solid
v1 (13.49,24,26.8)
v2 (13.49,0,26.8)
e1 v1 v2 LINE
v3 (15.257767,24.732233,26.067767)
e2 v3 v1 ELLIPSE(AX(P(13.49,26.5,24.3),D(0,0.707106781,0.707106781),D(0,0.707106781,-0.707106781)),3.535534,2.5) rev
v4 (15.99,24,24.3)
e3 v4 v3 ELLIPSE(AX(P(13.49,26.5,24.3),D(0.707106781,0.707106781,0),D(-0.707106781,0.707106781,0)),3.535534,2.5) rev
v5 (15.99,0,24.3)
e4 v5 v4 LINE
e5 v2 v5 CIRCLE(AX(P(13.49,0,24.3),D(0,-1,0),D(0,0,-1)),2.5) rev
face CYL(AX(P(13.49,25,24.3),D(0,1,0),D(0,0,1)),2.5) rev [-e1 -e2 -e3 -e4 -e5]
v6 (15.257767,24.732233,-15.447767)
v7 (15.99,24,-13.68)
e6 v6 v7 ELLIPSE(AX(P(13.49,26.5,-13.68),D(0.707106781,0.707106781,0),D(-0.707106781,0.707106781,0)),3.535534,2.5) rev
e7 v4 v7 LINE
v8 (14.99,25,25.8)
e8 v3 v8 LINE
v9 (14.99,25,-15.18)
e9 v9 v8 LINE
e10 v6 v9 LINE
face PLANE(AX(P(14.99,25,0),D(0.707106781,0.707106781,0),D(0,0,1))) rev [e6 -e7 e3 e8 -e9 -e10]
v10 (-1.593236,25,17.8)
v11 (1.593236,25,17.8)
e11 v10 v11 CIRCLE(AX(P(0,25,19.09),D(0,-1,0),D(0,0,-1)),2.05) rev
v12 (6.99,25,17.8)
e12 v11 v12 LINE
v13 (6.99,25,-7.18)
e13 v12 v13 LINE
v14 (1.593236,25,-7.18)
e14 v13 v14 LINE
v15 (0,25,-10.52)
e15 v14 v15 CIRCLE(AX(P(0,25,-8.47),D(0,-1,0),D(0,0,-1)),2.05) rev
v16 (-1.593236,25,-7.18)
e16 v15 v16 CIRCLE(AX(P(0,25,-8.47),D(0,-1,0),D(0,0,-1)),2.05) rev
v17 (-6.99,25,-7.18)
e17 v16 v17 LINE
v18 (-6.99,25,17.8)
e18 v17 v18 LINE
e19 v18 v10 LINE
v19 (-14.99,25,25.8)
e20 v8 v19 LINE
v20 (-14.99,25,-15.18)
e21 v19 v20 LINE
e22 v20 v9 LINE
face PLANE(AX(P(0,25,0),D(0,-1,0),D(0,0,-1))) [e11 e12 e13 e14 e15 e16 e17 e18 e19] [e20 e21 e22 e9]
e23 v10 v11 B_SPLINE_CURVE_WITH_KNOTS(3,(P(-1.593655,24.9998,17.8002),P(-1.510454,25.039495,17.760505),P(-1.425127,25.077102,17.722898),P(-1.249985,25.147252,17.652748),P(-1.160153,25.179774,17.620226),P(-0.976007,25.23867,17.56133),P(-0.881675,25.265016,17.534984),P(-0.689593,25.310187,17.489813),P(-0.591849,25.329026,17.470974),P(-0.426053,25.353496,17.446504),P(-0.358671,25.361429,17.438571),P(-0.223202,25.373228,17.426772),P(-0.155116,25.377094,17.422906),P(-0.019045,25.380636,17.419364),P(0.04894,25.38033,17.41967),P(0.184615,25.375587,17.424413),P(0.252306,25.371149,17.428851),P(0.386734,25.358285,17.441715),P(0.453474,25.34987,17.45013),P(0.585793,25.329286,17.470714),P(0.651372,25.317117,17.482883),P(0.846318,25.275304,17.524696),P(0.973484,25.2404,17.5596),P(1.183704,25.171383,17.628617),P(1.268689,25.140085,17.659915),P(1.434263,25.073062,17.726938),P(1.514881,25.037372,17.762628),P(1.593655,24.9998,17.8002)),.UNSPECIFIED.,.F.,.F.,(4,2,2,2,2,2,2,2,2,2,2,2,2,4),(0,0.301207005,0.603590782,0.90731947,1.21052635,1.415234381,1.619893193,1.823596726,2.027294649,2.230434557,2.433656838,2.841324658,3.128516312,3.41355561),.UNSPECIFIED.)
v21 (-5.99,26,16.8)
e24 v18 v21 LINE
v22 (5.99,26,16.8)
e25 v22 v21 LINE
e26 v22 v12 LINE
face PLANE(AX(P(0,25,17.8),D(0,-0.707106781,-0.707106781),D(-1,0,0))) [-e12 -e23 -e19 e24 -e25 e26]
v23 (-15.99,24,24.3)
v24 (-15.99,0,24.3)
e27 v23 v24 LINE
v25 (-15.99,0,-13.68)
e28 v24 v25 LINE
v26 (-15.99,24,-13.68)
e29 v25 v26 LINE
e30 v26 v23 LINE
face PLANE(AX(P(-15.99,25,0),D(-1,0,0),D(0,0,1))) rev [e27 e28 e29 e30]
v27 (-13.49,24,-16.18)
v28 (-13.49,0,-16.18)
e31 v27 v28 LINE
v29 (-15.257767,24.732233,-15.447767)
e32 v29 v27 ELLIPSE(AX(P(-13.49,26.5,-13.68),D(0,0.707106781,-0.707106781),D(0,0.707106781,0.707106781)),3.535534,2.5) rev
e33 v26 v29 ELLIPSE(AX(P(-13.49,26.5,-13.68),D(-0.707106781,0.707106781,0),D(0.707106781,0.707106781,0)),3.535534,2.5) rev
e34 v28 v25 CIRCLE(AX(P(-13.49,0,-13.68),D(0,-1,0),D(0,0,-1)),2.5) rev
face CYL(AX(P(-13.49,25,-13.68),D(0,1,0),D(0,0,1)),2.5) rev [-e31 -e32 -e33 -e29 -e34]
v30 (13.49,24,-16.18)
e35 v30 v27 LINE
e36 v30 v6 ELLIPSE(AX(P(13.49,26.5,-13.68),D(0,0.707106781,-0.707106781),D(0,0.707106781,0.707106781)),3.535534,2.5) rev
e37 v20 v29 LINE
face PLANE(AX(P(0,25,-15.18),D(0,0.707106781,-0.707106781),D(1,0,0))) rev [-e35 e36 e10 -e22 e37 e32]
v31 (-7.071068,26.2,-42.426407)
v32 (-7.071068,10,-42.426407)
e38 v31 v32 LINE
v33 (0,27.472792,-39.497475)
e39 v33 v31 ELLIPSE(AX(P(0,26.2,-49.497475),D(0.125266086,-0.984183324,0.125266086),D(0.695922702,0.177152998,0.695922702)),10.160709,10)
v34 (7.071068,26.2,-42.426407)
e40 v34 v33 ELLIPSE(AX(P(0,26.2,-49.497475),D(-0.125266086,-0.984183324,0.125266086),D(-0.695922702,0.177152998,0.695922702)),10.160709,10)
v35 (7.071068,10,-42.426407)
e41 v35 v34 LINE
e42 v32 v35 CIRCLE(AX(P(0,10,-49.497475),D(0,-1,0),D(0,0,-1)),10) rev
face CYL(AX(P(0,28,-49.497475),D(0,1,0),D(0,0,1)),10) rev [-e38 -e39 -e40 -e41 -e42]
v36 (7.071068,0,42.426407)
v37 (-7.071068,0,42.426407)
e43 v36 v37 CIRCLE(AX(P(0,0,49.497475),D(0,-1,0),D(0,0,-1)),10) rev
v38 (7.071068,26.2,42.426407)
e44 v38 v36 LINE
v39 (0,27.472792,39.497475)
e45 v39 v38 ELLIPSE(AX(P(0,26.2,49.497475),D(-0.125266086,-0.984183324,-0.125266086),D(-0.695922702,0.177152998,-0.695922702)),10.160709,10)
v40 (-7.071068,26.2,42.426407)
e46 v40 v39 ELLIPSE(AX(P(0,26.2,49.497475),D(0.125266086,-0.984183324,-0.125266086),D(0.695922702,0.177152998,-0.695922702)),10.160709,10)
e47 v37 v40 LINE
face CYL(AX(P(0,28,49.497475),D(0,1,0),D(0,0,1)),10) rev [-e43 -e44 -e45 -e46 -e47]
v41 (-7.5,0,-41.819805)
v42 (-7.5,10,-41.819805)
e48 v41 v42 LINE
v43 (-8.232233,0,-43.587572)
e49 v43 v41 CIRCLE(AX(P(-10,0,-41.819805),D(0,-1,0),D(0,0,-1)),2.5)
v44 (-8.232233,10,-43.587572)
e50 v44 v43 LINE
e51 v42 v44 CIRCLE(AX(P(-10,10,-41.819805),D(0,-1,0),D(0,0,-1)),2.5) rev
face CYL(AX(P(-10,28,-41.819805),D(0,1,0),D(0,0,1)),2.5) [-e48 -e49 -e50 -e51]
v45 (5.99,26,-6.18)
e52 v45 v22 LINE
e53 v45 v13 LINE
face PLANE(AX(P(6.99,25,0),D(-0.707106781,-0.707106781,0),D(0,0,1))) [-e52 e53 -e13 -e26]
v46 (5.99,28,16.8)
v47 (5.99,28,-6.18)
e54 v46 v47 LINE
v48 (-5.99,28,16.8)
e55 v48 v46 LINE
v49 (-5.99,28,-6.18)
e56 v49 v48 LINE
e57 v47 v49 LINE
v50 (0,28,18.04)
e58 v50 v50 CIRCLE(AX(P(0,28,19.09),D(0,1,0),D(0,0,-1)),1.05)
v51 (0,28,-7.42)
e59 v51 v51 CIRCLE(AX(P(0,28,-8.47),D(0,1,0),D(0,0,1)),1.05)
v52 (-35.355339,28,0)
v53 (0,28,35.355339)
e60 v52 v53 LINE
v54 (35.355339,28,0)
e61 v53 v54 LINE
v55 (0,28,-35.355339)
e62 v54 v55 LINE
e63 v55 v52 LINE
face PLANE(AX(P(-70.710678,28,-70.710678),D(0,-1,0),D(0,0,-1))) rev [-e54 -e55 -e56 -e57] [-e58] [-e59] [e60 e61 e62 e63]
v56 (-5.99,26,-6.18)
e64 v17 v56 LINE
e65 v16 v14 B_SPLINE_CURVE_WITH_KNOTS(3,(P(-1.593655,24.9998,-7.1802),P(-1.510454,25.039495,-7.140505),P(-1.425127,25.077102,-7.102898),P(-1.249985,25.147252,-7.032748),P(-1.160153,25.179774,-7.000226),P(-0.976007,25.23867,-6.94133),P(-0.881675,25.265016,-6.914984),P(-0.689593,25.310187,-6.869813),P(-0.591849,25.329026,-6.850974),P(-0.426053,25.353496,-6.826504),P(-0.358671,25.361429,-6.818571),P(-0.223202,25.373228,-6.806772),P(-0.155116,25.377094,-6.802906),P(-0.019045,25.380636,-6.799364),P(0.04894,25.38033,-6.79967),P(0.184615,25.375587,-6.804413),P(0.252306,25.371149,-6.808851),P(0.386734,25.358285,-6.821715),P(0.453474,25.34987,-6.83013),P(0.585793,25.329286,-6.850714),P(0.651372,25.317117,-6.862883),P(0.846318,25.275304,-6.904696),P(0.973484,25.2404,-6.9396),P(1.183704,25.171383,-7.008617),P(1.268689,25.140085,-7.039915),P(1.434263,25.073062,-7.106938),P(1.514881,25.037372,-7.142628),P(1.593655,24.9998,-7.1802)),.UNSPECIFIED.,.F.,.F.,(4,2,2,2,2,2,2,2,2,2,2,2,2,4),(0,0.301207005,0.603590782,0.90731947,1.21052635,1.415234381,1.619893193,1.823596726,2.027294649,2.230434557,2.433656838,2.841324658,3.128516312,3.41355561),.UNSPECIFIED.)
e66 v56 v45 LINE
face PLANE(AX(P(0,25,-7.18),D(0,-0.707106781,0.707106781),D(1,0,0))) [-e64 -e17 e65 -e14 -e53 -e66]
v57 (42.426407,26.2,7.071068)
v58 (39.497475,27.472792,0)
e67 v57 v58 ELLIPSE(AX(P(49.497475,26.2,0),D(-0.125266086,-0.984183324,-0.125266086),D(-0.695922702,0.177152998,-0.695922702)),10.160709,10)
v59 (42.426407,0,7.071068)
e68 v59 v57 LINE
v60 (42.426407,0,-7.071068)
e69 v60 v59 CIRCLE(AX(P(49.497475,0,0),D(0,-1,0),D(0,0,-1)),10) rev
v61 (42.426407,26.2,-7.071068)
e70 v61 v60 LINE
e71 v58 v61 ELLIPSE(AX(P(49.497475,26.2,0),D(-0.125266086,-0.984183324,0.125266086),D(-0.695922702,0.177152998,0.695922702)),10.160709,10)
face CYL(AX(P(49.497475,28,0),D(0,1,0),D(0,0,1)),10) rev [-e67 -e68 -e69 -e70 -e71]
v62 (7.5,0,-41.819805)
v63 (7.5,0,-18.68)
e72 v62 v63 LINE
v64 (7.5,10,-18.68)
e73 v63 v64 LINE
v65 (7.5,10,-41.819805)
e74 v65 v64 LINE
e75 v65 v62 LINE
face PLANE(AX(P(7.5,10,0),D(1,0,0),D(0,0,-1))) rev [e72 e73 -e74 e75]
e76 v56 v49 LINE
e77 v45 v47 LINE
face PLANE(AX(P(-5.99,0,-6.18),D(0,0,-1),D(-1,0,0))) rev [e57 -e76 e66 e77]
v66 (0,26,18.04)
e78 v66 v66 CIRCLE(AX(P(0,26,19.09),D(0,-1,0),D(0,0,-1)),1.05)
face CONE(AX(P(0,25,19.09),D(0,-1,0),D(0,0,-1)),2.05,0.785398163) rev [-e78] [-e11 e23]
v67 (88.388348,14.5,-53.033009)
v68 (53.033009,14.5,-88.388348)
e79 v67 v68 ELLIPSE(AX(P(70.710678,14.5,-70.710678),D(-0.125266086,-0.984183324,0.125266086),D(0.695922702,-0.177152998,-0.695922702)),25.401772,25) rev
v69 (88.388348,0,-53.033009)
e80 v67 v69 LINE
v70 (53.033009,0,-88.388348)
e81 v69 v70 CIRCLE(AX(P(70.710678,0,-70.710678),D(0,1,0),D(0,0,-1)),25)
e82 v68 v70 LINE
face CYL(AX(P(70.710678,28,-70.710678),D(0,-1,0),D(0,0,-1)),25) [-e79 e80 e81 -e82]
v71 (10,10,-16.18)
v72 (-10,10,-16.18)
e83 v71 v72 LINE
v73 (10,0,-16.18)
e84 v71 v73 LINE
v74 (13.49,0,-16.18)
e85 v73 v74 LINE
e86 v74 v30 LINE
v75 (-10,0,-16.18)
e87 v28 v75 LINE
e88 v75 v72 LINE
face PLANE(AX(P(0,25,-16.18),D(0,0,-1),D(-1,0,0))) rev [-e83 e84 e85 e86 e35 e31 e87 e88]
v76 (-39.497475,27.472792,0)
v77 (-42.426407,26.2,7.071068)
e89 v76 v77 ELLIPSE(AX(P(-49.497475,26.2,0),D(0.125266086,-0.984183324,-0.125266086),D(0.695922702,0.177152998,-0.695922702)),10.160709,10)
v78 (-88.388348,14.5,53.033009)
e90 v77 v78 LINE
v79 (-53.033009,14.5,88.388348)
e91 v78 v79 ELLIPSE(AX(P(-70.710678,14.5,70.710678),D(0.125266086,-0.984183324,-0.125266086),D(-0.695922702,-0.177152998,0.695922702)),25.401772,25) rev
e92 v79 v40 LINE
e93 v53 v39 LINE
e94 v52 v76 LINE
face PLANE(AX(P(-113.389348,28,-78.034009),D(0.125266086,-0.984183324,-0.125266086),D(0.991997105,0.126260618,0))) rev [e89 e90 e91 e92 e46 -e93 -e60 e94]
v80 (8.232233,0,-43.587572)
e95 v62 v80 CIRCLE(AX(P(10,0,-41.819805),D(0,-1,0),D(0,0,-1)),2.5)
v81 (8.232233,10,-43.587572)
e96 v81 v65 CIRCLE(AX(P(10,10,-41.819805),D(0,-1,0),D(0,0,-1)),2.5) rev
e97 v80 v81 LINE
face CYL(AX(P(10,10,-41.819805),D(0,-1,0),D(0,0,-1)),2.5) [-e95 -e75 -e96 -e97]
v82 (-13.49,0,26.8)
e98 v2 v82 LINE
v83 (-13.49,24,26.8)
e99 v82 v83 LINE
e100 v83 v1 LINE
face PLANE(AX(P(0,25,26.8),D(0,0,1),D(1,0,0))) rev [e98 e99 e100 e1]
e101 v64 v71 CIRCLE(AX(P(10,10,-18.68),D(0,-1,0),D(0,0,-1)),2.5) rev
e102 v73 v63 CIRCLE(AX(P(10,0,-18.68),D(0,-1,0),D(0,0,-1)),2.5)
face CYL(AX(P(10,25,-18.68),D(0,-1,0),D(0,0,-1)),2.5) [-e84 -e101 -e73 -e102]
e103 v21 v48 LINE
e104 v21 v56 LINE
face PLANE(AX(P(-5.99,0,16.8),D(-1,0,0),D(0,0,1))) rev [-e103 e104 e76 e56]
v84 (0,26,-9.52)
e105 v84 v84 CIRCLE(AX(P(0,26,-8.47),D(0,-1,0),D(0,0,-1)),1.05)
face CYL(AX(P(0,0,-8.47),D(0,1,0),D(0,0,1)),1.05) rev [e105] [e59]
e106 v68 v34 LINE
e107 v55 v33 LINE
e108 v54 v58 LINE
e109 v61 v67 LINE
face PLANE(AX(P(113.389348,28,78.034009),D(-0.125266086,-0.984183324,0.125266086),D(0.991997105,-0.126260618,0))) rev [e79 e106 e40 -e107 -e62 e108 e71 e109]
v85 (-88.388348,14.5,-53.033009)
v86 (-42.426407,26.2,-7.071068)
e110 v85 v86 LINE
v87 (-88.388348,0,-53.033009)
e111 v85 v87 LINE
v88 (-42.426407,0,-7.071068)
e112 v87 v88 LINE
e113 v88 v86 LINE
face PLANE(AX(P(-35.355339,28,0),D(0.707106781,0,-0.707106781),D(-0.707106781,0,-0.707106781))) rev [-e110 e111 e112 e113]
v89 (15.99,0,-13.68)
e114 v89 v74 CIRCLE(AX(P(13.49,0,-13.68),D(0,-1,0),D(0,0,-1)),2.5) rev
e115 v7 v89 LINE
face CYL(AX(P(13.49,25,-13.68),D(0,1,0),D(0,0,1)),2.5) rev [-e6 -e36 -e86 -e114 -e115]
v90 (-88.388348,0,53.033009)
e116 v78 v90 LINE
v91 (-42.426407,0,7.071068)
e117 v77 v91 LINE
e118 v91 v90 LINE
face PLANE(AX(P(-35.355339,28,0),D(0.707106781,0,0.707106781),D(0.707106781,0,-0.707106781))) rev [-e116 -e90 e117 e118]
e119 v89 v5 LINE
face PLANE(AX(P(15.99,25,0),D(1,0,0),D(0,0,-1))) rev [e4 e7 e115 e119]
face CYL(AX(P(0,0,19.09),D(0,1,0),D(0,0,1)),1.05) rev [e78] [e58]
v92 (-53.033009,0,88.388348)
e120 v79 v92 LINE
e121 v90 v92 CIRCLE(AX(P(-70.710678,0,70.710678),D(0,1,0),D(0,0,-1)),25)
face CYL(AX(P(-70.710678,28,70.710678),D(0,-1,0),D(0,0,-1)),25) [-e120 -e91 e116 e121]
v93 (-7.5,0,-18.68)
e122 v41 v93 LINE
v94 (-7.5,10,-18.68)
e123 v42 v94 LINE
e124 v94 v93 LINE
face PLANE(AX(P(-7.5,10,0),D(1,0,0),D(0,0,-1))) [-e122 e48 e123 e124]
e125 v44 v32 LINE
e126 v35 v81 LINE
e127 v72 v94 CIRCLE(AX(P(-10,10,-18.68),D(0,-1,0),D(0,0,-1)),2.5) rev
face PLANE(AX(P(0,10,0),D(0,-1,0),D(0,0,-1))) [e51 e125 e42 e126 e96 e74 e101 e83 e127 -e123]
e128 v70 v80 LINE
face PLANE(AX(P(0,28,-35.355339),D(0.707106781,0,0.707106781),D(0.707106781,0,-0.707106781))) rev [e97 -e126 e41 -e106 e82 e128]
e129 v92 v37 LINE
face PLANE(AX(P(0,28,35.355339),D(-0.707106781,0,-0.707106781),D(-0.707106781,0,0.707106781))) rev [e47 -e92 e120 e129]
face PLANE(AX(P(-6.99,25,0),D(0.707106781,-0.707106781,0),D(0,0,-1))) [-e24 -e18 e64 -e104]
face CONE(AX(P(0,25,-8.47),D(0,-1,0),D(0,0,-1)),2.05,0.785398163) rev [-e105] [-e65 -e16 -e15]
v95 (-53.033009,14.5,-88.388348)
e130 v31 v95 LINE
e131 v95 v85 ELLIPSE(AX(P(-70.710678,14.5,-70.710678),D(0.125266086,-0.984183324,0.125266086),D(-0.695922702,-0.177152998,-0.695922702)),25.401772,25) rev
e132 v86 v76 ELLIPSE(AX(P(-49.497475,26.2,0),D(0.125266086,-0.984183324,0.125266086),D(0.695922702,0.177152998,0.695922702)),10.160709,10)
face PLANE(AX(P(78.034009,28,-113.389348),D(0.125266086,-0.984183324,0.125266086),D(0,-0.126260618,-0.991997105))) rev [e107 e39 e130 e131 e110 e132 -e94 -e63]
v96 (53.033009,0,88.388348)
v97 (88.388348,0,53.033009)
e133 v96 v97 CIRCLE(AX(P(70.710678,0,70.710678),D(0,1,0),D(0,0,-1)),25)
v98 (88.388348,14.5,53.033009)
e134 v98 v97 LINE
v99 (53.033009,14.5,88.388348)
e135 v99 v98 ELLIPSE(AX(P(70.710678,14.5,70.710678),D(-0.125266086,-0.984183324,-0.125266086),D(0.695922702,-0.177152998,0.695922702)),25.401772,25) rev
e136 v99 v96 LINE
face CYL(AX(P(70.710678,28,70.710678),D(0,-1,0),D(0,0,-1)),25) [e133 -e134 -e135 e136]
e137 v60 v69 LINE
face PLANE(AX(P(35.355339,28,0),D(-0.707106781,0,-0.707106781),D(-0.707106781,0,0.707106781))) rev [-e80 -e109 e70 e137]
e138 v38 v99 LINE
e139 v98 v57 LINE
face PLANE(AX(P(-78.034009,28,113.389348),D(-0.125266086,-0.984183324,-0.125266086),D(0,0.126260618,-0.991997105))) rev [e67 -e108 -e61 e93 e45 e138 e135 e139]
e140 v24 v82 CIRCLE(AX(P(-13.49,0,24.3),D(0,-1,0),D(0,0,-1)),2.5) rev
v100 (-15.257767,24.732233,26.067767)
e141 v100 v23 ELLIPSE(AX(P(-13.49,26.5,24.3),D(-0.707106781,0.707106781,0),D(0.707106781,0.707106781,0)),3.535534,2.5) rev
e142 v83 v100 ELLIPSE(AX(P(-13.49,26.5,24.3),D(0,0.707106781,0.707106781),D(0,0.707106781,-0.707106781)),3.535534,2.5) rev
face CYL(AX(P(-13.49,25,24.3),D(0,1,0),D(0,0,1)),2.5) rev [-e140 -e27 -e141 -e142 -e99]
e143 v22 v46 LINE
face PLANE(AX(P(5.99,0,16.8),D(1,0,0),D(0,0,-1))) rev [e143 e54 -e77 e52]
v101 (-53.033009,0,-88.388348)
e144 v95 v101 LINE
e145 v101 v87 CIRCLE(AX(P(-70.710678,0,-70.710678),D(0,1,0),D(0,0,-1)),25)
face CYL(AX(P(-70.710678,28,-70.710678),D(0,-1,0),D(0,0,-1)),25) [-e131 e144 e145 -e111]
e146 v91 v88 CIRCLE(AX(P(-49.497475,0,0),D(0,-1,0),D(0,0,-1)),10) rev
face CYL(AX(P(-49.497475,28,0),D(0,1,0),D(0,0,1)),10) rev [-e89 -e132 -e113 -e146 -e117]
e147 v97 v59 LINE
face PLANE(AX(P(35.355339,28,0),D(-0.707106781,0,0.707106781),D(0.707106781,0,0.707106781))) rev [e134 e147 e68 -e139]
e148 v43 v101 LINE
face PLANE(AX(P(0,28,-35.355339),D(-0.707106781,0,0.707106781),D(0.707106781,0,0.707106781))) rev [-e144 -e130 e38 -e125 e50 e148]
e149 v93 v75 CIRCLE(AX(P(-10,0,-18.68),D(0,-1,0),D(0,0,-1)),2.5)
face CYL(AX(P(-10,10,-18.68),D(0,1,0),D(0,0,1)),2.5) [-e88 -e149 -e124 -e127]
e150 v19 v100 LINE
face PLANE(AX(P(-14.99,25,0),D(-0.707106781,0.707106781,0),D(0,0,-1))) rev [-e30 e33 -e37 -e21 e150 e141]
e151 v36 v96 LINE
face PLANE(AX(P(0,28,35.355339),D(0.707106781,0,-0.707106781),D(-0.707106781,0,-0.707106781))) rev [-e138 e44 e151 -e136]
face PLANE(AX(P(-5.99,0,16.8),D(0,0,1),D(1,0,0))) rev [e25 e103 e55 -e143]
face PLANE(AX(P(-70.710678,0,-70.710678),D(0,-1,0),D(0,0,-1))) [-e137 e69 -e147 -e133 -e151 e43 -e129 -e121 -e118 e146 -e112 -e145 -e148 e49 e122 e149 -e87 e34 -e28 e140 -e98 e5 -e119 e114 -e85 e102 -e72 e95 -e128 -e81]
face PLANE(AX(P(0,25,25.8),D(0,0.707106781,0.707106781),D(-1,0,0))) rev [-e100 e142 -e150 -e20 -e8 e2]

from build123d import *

# Parameters (mm, degrees)
BOSS_EXTRUDE2_DEPTH = 28
SKETCH3_R           = 1.05
SKETCH3_W           = 11.98
SKETCH3_H           = 22.98
CUT_EXTRUDE1_DEPTH  = 28
CUT_EXTRUDE2_START  = -25
SKETCH4_R           = 1.05
SKETCH4_W           = 11.98
SKETCH4_H           = 22.98
CUT_EXTRUDE2_DEPTH  = 25
CUT_EXTRUDE4_DEPTH  = 10
CUT_EXTRUDE5_REACH  = 164.782
CIRPATTERN1_COUNT   = 4
FILLET1_R           = 10
CHAMFER1_SIZE       = 1
FILLET2_R           = 2.5


with BuildPart() as part:
    # Sketch1 → Boss-Extrude2 (new body)
    with BuildSketch(Plane(origin=(0, 0, 0), x_dir=(1, 0, 0), z_dir=(0, 1, 0))):
        with BuildLine():
            Line((0, 35.355339059), (53.033008589, 88.388347648))
            ThreePointArc((53.033008589, 88.388347648), (88.388347648, 88.388347648), (88.388347648, 53.033008589))
            Line((88.388347648, 53.033008589), (35.355339059, 0))
            Line((35.355339059, 0), (88.388347648, -53.033008589))
            ThreePointArc((88.388347648, -53.033008589), (88.388347648, -88.388347648), (53.033008589, -88.388347648))
            Line((53.033008589, -88.388347648), (0, -35.355339059))
            Line((0, -35.355339059), (-53.033008589, -88.388347648))
            ThreePointArc((-53.033008589, -88.388347648), (-88.388347648, -88.388347648), (-88.388347648, -53.033008589))
            Line((-88.388347648, -53.033008589), (-35.355339059, 0))
            Line((-35.355339059, 0), (-88.388347648, 53.033008589))
            ThreePointArc((-88.388347648, 53.033008589), (-88.388347648, 88.388347648), (-53.033008589, 88.388347648))
            Line((-53.033008589, 88.388347648), (0, 35.355339059))
        make_face()
    extrude(amount=BOSS_EXTRUDE2_DEPTH)

    # Sketch3 → Cut-Extrude1 (cut)
    with BuildSketch(Plane(origin=(0, 28, 0), x_dir=(1, 0, 0), z_dir=(0, 1, 0))):
        with Locations(Location((0, 8.47, 0), (0, 0, 270))):
            Circle(SKETCH3_R)
        with Locations(Location((0, -19.09, 0), (0, 0, 90))):
            Circle(SKETCH3_R)
        with Locations((0, -5.31)):
            Rectangle(SKETCH3_W, SKETCH3_H)
    extrude(amount=-CUT_EXTRUDE1_DEPTH, mode=Mode.SUBTRACT)

    # Sketch4 → Cut-Extrude2 (cut)
    with BuildSketch(Plane.XZ.offset(CUT_EXTRUDE2_START)):
        Polygon((15.99, -16.18), (15.99, 26.8), (7.5, 26.8), (-7.5, 26.8), (-15.99, 26.8), (-15.99, -16.18), (-7.5, -16.18), (7.5, -16.18), align=None)
        with Locations(Location((0, -8.47, 0), (0, 0, 90))):
            Circle(SKETCH4_R, mode=Mode.SUBTRACT)
        with Locations(Location((0, 19.09, 0), (0, 0, 270))):
            Circle(SKETCH4_R, mode=Mode.SUBTRACT)
        with Locations((0, 5.31)):
            Rectangle(SKETCH4_W, SKETCH4_H, mode=Mode.SUBTRACT)
    extrude(amount=CUT_EXTRUDE2_DEPTH, mode=Mode.SUBTRACT)

    # Sketch4<4> → Cut-Extrude4 (cut)
    with BuildSketch(Plane.XZ):
        Polygon((-7.5, -16.18), (-7.5, -42.855339059), (0, -35.355339059), (7.5, -42.855339059), (7.5, -16.18), align=None)
    extrude(amount=-CUT_EXTRUDE4_DEPTH, mode=Mode.SUBTRACT)

    # Sketch5 → Cut-Extrude5 (cut, up to next)
    with BuildSketch(Plane(origin=(17.67766953, 0, -17.67766953), x_dir=(-0.7071067811865419, 0, -0.7071067811865532), z_dir=(0.7071067811865532, 0, -0.7071067811865419)), mode=Mode.PRIVATE) as cut_extrude5_sk1:
        Polygon((-25, 28), (-125, 10), (-125, 28), align=None)
    cut_extrude5_tool1 = extrude(cut_extrude5_sk1.sketch, amount=-CUT_EXTRUDE5_REACH, mode=Mode.PRIVATE) & part.part
    cut_extrude5 = cut_extrude5_tool1.solids().sort_by_distance((82.495791, 22, 47.140452))[0]
    add(cut_extrude5, mode=Mode.SUBTRACT)

    # CirPattern1: Cut-Extrude5 ×4 about axis
    cirpattern1_axis = Axis((0, 0, 0), (0, 1, 0))
    for i in range(1, CIRPATTERN1_COUNT):
        add(cut_extrude5.rotate(cirpattern1_axis, i * 360 / CIRPATTERN1_COUNT), mode=Mode.SUBTRACT)

    # Fillet1
    # the kernel refuses this fillet: 10 mm, written as the material it adds along each edge
    with BuildSketch(Plane(origin=(0, 10, -35.355339059), x_dir=(-0.7071067811865379, 0, -0.7071067811865571), z_dir=(0, 1, 0))) as fillet1_piece_1_section:
        with BuildLine():
            CenterArc((FILLET1_R, -FILLET1_R), FILLET1_R, 90, 90)
            Line((0, -FILLET1_R), (0, 0))
            Line((0, 0), (FILLET1_R, 0))
        make_face()
    fillet1_piece_1 = extrude(amount=43, mode=Mode.PRIVATE)
    fillet1_piece_1 = split(fillet1_piece_1, bisect_by=Plane(origin=(-1.101274735, 27.315624415, -39.63102674), z_dir=(0.12526608641625125, -0.9841833239736955, 0.1252660864162533)), keep=Keep.TOP, mode=Mode.PRIVATE)
    fillet1_piece_1 = split(fillet1_piece_1, bisect_by=Plane(origin=(1.101274735, 27.315624415, -39.63102674), z_dir=(-0.1252660864162533, -0.9841833239736955, 0.12526608641625125)), keep=Keep.TOP, mode=Mode.PRIVATE)
    add(fillet1_piece_1)
    with BuildSketch(Plane(origin=(35.355339059, 0, 0), x_dir=(0.7071067811865419, 0, 0.7071067811865532), z_dir=(0, 1, 0))) as fillet1_piece_2_section:
        with BuildLine():
            CenterArc((FILLET1_R, FILLET1_R), FILLET1_R, 180, 90)
            Line((0, FILLET1_R), (0, 0))
            Line((0, 0), (FILLET1_R, 0))
        make_face()
    fillet1_piece_2 = extrude(amount=53, mode=Mode.PRIVATE)
    fillet1_piece_2 = split(fillet1_piece_2, bisect_by=Plane(origin=(40.257461149, 27.157432054, 1.717716892), z_dir=(-0.12526608641625128, -0.9841833239736955, -0.12526608641625328)), keep=Keep.TOP, mode=Mode.PRIVATE)
    fillet1_piece_2 = split(fillet1_piece_2, bisect_by=Plane(origin=(40.257461149, 27.157432054, -1.717716892), z_dir=(-0.1252660864162533, -0.9841833239736955, 0.12526608641625125)), keep=Keep.TOP, mode=Mode.PRIVATE)
    add(fillet1_piece_2)
    with BuildSketch(Plane(origin=(0, 0, 35.355339059), x_dir=(-0.7071067811865579, 0, 0.7071067811865371), z_dir=(0, 1, 0))) as fillet1_piece_3_section:
        with BuildLine():
            CenterArc((FILLET1_R, FILLET1_R), FILLET1_R, 180, 90)
            Line((0, FILLET1_R), (0, 0))
            Line((0, 0), (FILLET1_R, 0))
        make_face()
    fillet1_piece_3 = extrude(amount=53, mode=Mode.PRIVATE)
    fillet1_piece_3 = split(fillet1_piece_3, bisect_by=Plane(origin=(-1.717716892, 27.157432054, 40.257461149), z_dir=(0.1252660864162533, -0.9841833239736955, -0.12526608641625125)), keep=Keep.TOP, mode=Mode.PRIVATE)
    fillet1_piece_3 = split(fillet1_piece_3, bisect_by=Plane(origin=(1.717716892, 27.157432054, 40.257461149), z_dir=(-0.12526608641625128, -0.9841833239736955, -0.12526608641625328)), keep=Keep.TOP, mode=Mode.PRIVATE)
    add(fillet1_piece_3)
    with BuildSketch(Plane(origin=(-35.355339059, 0, 0), x_dir=(-0.7071067811865355, 0, -0.7071067811865597), z_dir=(0, 1, 0))) as fillet1_piece_4_section:
        with BuildLine():
            CenterArc((FILLET1_R, FILLET1_R), FILLET1_R, 180, 90)
            Line((0, FILLET1_R), (0, 0))
            Line((0, 0), (FILLET1_R, 0))
        make_face()
    fillet1_piece_4 = extrude(amount=53, mode=Mode.PRIVATE)
    fillet1_piece_4 = split(fillet1_piece_4, bisect_by=Plane(origin=(-40.257461149, 27.157432054, -1.717716892), z_dir=(0.12526608641625125, -0.9841833239736955, 0.1252660864162533)), keep=Keep.TOP, mode=Mode.PRIVATE)
    fillet1_piece_4 = split(fillet1_piece_4, bisect_by=Plane(origin=(-40.257461149, 27.157432054, 1.717716892), z_dir=(0.1252660864162533, -0.9841833239736955, -0.12526608641625125)), keep=Keep.TOP, mode=Mode.PRIVATE)
    add(fillet1_piece_4)

    # Chamfer1
    # the kernel refuses this chamfer: 1 mm, written as the material it adds along each edge
    with BuildSketch(Plane(origin=(15.99, 25, -18.751682988), x_dir=(0.027495876610585647, -0.9996219169112968, 0), z_dir=(0, 0, 1)), Plane(origin=(-15.99, 25, 29.371682988), x_dir=(-0.027495876610585647, -0.9996219169112968, 0), z_dir=(0, 0, -1))) as chamfer1_piece_1:
        Polygon((CHAMFER1_SIZE * 0.999621916911, -CHAMFER1_SIZE * 0.0274958766106), (-CHAMFER1_SIZE * 0.0274958766106, -CHAMFER1_SIZE * 0.999621916911), (0, 0), align=None)
    extrude(amount=48.123365976)
    with BuildSketch(Plane(origin=(-18.561682988, 25, -16.18), x_dir=(0, -0.9996219169112968, -0.027495876610585647), z_dir=(1, 0, 0)), Plane(origin=(18.561682988, 25, 26.8), x_dir=(0, -0.9996219169112968, 0.027495876610585647), z_dir=(-1, 0, 0))) as chamfer1_piece_2:
        Polygon((CHAMFER1_SIZE * 0.999621916911, -CHAMFER1_SIZE * 0.0274958766106), (-CHAMFER1_SIZE * 0.0274958766106, -CHAMFER1_SIZE * 0.999621916911), (0, 0), align=None)
    extrude(amount=37.123365976)
    # the kernel refuses this chamfer: 1 mm, written as the material it takes off along each edge
    with BuildSketch(Plane(origin=(-5.99, 25, 16.8), x_dir=(0, 0.9996219169112968, -0.027495876610585647), z_dir=(1, 0, 0)), Plane(origin=(5.99, 25, -6.18), x_dir=(0, 0.9996219169112968, 0.02749587661058651), z_dir=(-1, 0, 0))) as chamfer1_2_piece_1:
        Polygon((CHAMFER1_SIZE * 0.999621916911, CHAMFER1_SIZE * 0.0274958766106), (-CHAMFER1_SIZE * 0.0274958766106, CHAMFER1_SIZE * 0.999621916911), (0, 0), align=None)
    extrude(amount=11.98, mode=Mode.SUBTRACT)
    with BuildSketch(Plane(origin=(-5.99, 25, -6.18), x_dir=(0.02749587661057961, 0.999621916911297, 0), z_dir=(0, 0, 1)), Plane(origin=(5.99, 25, 16.8), x_dir=(-0.02749587661058651, 0.9996219169112968, 0), z_dir=(0, 0, -1))) as chamfer1_2_piece_2:
        Polygon((CHAMFER1_SIZE * 0.999621916911, CHAMFER1_SIZE * 0.0274958766106), (-CHAMFER1_SIZE * 0.0274958766106, CHAMFER1_SIZE * 0.999621916911), (0, 0), align=None)
    extrude(amount=22.98, mode=Mode.SUBTRACT)
    with BuildSketch(Plane(origin=(0, 25, 19.09), x_dir=(0, 0, -1), z_dir=(-1, 0, 0))) as chamfer1_2_piece_3:
        Polygon((1.05, -CHAMFER1_SIZE), (1.05 + CHAMFER1_SIZE, 0), (1.05, 0), align=None)
    revolve(axis=Axis((0, 25, 19.09), (0, -1, 0)), mode=Mode.SUBTRACT)
    with BuildSketch(Plane(origin=(0, 25, -8.47), x_dir=(0, 0, 1), z_dir=(1, 0, 0))) as chamfer1_2_piece_4:
        Polygon((1.05, -CHAMFER1_SIZE), (1.05 + CHAMFER1_SIZE, 0), (1.05, 0), align=None)
    revolve(axis=Axis((0, 25, -8.47), (0, -1, 0)), mode=Mode.SUBTRACT)
    with BuildSketch(Plane(origin=(-5.99, 25, -6.18), x_dir=(0.02749587661057961, 0.999621916911297, 0), z_dir=(0, 0, 1))) as chamfer1_2_piece_5a_section:
        Polygon((CHAMFER1_SIZE * 0.999621916911, CHAMFER1_SIZE * 0.0274958766106), (-CHAMFER1_SIZE * 0.0274958766106, CHAMFER1_SIZE * 0.999621916911), (0, 0), align=None)
    chamfer1_2_piece_5a = extrude(amount=25.551682988, mode=Mode.PRIVATE)
    chamfer1_2_piece_5a = split(chamfer1_2_piece_5a, bisect_by=Plane(origin=(-6.319793627, 25.329793627, 16.8), z_dir=(0, 0, 1)), keep=Keep.TOP, mode=Mode.PRIVATE)
    with BuildSketch(Plane(origin=(-8.561682988, 25, 16.8), x_dir=(0, 0.9996219169112968, -0.027495876610585647), z_dir=(1, 0, 0))) as chamfer1_2_piece_5b_section:
        Polygon((CHAMFER1_SIZE * 0.999621916911, CHAMFER1_SIZE * 0.0274958766106), (-CHAMFER1_SIZE * 0.0274958766106, CHAMFER1_SIZE * 0.999621916911), (0, 0), align=None)
    chamfer1_2_piece_5b = extrude(amount=14.551682988, mode=Mode.PRIVATE)
    chamfer1_2_piece_5b = split(chamfer1_2_piece_5b, bisect_by=Plane(origin=(-5.99, 25.329793627, 17.129793627), z_dir=(-1, 0, 0)), keep=Keep.TOP, mode=Mode.PRIVATE)
    chamfer1_2_piece_5 = chamfer1_2_piece_5a & chamfer1_2_piece_5b
    add(chamfer1_2_piece_5, mode=Mode.SUBTRACT)
    with BuildSketch(Plane(origin=(-5.99, 25, 16.8), x_dir=(0, 0.9996219169112968, -0.027495876610585647), z_dir=(1, 0, 0))) as chamfer1_2_piece_6a_section:
        Polygon((CHAMFER1_SIZE * 0.999621916911, CHAMFER1_SIZE * 0.0274958766106), (-CHAMFER1_SIZE * 0.0274958766106, CHAMFER1_SIZE * 0.999621916911), (0, 0), align=None)
    chamfer1_2_piece_6a = extrude(amount=14.551682988, mode=Mode.PRIVATE)
    chamfer1_2_piece_6a = split(chamfer1_2_piece_6a, bisect_by=Plane(origin=(5.99, 25.329793627, 17.129793627), z_dir=(1, 0, 0)), keep=Keep.TOP, mode=Mode.PRIVATE)
    with BuildSketch(Plane(origin=(5.99, 25, 19.371682988), x_dir=(-0.02749587661058651, 0.9996219169112968, 0), z_dir=(0, 0, -1))) as chamfer1_2_piece_6b_section:
        Polygon((CHAMFER1_SIZE * 0.999621916911, CHAMFER1_SIZE * 0.0274958766106), (-CHAMFER1_SIZE * 0.0274958766106, CHAMFER1_SIZE * 0.999621916911), (0, 0), align=None)
    chamfer1_2_piece_6b = extrude(amount=25.551682988, mode=Mode.PRIVATE)
    chamfer1_2_piece_6b = split(chamfer1_2_piece_6b, bisect_by=Plane(origin=(6.319793627, 25.329793627, 16.8), z_dir=(0, 0, 1)), keep=Keep.TOP, mode=Mode.PRIVATE)
    chamfer1_2_piece_6 = chamfer1_2_piece_6a & chamfer1_2_piece_6b
    add(chamfer1_2_piece_6, mode=Mode.SUBTRACT)
    with BuildSketch(Plane(origin=(-5.99, 25, -8.751682988), x_dir=(0.02749587661058651, 0.9996219169112968, 0), z_dir=(0, 0, 1))) as chamfer1_2_piece_7a_section:
        Polygon((CHAMFER1_SIZE * 0.999621916911, CHAMFER1_SIZE * 0.0274958766106), (-CHAMFER1_SIZE * 0.0274958766106, CHAMFER1_SIZE * 0.999621916911), (0, 0), align=None)
    chamfer1_2_piece_7a = extrude(amount=25.551682988, mode=Mode.PRIVATE)
    chamfer1_2_piece_7a = split(chamfer1_2_piece_7a, bisect_by=Plane(origin=(-6.319793627, 25.329793627, -6.18), z_dir=(0, 0, -1)), keep=Keep.TOP, mode=Mode.PRIVATE)
    with BuildSketch(Plane(origin=(5.99, 25, -6.18), x_dir=(0, 0.9996219169112968, 0.02749587661058651), z_dir=(-1, 0, 0))) as chamfer1_2_piece_7b_section:
        Polygon((CHAMFER1_SIZE * 0.999621916911, CHAMFER1_SIZE * 0.0274958766106), (-CHAMFER1_SIZE * 0.0274958766106, CHAMFER1_SIZE * 0.999621916911), (0, 0), align=None)
    chamfer1_2_piece_7b = extrude(amount=14.551682988, mode=Mode.PRIVATE)
    chamfer1_2_piece_7b = split(chamfer1_2_piece_7b, bisect_by=Plane(origin=(-5.99, 25.329793627, -6.509793627), z_dir=(-1, 0, 0)), keep=Keep.TOP, mode=Mode.PRIVATE)
    chamfer1_2_piece_7 = chamfer1_2_piece_7a & chamfer1_2_piece_7b
    add(chamfer1_2_piece_7, mode=Mode.SUBTRACT)
    with BuildSketch(Plane(origin=(8.561682988, 25, -6.18), x_dir=(0, 0.9996219169112968, 0.02749587661058651), z_dir=(-1, 0, 0))) as chamfer1_2_piece_8a_section:
        Polygon((CHAMFER1_SIZE * 0.999621916911, CHAMFER1_SIZE * 0.0274958766106), (-CHAMFER1_SIZE * 0.0274958766106, CHAMFER1_SIZE * 0.999621916911), (0, 0), align=None)
    chamfer1_2_piece_8a = extrude(amount=14.551682988, mode=Mode.PRIVATE)
    chamfer1_2_piece_8a = split(chamfer1_2_piece_8a, bisect_by=Plane(origin=(5.99, 25.329793627, -6.509793627), z_dir=(1, 0, 0)), keep=Keep.TOP, mode=Mode.PRIVATE)
    with BuildSketch(Plane(origin=(5.99, 25, 16.8), x_dir=(-0.02749587661058651, 0.9996219169112968, 0), z_dir=(0, 0, -1))) as chamfer1_2_piece_8b_section:
        Polygon((CHAMFER1_SIZE * 0.999621916911, CHAMFER1_SIZE * 0.0274958766106), (-CHAMFER1_SIZE * 0.0274958766106, CHAMFER1_SIZE * 0.999621916911), (0, 0), align=None)
    chamfer1_2_piece_8b = extrude(amount=25.551682988, mode=Mode.PRIVATE)
    chamfer1_2_piece_8b = split(chamfer1_2_piece_8b, bisect_by=Plane(origin=(6.319793627, 25.329793627, -6.18), z_dir=(0, 0, -1)), keep=Keep.TOP, mode=Mode.PRIVATE)
    chamfer1_2_piece_8 = chamfer1_2_piece_8a & chamfer1_2_piece_8b
    add(chamfer1_2_piece_8, mode=Mode.SUBTRACT)

    # Fillet2
    fillet2_edges = [part.edges().sort_by_distance(p)[0] for p in [
        (7.5, 5, -16.18),
        (7.5, 5, -42.855339059),
        (-7.5, 5, -42.855339059),
        (-7.5, 5, -16.18),
        (15.99, 12, -16.18),
        (-15.99, 12, -16.18),
        (-15.99, 12, 26.8),
        (15.99, 12, 26.8),
    ]]
    fillet(fillet2_edges, radius=FILLET2_R)


solid = part.part
